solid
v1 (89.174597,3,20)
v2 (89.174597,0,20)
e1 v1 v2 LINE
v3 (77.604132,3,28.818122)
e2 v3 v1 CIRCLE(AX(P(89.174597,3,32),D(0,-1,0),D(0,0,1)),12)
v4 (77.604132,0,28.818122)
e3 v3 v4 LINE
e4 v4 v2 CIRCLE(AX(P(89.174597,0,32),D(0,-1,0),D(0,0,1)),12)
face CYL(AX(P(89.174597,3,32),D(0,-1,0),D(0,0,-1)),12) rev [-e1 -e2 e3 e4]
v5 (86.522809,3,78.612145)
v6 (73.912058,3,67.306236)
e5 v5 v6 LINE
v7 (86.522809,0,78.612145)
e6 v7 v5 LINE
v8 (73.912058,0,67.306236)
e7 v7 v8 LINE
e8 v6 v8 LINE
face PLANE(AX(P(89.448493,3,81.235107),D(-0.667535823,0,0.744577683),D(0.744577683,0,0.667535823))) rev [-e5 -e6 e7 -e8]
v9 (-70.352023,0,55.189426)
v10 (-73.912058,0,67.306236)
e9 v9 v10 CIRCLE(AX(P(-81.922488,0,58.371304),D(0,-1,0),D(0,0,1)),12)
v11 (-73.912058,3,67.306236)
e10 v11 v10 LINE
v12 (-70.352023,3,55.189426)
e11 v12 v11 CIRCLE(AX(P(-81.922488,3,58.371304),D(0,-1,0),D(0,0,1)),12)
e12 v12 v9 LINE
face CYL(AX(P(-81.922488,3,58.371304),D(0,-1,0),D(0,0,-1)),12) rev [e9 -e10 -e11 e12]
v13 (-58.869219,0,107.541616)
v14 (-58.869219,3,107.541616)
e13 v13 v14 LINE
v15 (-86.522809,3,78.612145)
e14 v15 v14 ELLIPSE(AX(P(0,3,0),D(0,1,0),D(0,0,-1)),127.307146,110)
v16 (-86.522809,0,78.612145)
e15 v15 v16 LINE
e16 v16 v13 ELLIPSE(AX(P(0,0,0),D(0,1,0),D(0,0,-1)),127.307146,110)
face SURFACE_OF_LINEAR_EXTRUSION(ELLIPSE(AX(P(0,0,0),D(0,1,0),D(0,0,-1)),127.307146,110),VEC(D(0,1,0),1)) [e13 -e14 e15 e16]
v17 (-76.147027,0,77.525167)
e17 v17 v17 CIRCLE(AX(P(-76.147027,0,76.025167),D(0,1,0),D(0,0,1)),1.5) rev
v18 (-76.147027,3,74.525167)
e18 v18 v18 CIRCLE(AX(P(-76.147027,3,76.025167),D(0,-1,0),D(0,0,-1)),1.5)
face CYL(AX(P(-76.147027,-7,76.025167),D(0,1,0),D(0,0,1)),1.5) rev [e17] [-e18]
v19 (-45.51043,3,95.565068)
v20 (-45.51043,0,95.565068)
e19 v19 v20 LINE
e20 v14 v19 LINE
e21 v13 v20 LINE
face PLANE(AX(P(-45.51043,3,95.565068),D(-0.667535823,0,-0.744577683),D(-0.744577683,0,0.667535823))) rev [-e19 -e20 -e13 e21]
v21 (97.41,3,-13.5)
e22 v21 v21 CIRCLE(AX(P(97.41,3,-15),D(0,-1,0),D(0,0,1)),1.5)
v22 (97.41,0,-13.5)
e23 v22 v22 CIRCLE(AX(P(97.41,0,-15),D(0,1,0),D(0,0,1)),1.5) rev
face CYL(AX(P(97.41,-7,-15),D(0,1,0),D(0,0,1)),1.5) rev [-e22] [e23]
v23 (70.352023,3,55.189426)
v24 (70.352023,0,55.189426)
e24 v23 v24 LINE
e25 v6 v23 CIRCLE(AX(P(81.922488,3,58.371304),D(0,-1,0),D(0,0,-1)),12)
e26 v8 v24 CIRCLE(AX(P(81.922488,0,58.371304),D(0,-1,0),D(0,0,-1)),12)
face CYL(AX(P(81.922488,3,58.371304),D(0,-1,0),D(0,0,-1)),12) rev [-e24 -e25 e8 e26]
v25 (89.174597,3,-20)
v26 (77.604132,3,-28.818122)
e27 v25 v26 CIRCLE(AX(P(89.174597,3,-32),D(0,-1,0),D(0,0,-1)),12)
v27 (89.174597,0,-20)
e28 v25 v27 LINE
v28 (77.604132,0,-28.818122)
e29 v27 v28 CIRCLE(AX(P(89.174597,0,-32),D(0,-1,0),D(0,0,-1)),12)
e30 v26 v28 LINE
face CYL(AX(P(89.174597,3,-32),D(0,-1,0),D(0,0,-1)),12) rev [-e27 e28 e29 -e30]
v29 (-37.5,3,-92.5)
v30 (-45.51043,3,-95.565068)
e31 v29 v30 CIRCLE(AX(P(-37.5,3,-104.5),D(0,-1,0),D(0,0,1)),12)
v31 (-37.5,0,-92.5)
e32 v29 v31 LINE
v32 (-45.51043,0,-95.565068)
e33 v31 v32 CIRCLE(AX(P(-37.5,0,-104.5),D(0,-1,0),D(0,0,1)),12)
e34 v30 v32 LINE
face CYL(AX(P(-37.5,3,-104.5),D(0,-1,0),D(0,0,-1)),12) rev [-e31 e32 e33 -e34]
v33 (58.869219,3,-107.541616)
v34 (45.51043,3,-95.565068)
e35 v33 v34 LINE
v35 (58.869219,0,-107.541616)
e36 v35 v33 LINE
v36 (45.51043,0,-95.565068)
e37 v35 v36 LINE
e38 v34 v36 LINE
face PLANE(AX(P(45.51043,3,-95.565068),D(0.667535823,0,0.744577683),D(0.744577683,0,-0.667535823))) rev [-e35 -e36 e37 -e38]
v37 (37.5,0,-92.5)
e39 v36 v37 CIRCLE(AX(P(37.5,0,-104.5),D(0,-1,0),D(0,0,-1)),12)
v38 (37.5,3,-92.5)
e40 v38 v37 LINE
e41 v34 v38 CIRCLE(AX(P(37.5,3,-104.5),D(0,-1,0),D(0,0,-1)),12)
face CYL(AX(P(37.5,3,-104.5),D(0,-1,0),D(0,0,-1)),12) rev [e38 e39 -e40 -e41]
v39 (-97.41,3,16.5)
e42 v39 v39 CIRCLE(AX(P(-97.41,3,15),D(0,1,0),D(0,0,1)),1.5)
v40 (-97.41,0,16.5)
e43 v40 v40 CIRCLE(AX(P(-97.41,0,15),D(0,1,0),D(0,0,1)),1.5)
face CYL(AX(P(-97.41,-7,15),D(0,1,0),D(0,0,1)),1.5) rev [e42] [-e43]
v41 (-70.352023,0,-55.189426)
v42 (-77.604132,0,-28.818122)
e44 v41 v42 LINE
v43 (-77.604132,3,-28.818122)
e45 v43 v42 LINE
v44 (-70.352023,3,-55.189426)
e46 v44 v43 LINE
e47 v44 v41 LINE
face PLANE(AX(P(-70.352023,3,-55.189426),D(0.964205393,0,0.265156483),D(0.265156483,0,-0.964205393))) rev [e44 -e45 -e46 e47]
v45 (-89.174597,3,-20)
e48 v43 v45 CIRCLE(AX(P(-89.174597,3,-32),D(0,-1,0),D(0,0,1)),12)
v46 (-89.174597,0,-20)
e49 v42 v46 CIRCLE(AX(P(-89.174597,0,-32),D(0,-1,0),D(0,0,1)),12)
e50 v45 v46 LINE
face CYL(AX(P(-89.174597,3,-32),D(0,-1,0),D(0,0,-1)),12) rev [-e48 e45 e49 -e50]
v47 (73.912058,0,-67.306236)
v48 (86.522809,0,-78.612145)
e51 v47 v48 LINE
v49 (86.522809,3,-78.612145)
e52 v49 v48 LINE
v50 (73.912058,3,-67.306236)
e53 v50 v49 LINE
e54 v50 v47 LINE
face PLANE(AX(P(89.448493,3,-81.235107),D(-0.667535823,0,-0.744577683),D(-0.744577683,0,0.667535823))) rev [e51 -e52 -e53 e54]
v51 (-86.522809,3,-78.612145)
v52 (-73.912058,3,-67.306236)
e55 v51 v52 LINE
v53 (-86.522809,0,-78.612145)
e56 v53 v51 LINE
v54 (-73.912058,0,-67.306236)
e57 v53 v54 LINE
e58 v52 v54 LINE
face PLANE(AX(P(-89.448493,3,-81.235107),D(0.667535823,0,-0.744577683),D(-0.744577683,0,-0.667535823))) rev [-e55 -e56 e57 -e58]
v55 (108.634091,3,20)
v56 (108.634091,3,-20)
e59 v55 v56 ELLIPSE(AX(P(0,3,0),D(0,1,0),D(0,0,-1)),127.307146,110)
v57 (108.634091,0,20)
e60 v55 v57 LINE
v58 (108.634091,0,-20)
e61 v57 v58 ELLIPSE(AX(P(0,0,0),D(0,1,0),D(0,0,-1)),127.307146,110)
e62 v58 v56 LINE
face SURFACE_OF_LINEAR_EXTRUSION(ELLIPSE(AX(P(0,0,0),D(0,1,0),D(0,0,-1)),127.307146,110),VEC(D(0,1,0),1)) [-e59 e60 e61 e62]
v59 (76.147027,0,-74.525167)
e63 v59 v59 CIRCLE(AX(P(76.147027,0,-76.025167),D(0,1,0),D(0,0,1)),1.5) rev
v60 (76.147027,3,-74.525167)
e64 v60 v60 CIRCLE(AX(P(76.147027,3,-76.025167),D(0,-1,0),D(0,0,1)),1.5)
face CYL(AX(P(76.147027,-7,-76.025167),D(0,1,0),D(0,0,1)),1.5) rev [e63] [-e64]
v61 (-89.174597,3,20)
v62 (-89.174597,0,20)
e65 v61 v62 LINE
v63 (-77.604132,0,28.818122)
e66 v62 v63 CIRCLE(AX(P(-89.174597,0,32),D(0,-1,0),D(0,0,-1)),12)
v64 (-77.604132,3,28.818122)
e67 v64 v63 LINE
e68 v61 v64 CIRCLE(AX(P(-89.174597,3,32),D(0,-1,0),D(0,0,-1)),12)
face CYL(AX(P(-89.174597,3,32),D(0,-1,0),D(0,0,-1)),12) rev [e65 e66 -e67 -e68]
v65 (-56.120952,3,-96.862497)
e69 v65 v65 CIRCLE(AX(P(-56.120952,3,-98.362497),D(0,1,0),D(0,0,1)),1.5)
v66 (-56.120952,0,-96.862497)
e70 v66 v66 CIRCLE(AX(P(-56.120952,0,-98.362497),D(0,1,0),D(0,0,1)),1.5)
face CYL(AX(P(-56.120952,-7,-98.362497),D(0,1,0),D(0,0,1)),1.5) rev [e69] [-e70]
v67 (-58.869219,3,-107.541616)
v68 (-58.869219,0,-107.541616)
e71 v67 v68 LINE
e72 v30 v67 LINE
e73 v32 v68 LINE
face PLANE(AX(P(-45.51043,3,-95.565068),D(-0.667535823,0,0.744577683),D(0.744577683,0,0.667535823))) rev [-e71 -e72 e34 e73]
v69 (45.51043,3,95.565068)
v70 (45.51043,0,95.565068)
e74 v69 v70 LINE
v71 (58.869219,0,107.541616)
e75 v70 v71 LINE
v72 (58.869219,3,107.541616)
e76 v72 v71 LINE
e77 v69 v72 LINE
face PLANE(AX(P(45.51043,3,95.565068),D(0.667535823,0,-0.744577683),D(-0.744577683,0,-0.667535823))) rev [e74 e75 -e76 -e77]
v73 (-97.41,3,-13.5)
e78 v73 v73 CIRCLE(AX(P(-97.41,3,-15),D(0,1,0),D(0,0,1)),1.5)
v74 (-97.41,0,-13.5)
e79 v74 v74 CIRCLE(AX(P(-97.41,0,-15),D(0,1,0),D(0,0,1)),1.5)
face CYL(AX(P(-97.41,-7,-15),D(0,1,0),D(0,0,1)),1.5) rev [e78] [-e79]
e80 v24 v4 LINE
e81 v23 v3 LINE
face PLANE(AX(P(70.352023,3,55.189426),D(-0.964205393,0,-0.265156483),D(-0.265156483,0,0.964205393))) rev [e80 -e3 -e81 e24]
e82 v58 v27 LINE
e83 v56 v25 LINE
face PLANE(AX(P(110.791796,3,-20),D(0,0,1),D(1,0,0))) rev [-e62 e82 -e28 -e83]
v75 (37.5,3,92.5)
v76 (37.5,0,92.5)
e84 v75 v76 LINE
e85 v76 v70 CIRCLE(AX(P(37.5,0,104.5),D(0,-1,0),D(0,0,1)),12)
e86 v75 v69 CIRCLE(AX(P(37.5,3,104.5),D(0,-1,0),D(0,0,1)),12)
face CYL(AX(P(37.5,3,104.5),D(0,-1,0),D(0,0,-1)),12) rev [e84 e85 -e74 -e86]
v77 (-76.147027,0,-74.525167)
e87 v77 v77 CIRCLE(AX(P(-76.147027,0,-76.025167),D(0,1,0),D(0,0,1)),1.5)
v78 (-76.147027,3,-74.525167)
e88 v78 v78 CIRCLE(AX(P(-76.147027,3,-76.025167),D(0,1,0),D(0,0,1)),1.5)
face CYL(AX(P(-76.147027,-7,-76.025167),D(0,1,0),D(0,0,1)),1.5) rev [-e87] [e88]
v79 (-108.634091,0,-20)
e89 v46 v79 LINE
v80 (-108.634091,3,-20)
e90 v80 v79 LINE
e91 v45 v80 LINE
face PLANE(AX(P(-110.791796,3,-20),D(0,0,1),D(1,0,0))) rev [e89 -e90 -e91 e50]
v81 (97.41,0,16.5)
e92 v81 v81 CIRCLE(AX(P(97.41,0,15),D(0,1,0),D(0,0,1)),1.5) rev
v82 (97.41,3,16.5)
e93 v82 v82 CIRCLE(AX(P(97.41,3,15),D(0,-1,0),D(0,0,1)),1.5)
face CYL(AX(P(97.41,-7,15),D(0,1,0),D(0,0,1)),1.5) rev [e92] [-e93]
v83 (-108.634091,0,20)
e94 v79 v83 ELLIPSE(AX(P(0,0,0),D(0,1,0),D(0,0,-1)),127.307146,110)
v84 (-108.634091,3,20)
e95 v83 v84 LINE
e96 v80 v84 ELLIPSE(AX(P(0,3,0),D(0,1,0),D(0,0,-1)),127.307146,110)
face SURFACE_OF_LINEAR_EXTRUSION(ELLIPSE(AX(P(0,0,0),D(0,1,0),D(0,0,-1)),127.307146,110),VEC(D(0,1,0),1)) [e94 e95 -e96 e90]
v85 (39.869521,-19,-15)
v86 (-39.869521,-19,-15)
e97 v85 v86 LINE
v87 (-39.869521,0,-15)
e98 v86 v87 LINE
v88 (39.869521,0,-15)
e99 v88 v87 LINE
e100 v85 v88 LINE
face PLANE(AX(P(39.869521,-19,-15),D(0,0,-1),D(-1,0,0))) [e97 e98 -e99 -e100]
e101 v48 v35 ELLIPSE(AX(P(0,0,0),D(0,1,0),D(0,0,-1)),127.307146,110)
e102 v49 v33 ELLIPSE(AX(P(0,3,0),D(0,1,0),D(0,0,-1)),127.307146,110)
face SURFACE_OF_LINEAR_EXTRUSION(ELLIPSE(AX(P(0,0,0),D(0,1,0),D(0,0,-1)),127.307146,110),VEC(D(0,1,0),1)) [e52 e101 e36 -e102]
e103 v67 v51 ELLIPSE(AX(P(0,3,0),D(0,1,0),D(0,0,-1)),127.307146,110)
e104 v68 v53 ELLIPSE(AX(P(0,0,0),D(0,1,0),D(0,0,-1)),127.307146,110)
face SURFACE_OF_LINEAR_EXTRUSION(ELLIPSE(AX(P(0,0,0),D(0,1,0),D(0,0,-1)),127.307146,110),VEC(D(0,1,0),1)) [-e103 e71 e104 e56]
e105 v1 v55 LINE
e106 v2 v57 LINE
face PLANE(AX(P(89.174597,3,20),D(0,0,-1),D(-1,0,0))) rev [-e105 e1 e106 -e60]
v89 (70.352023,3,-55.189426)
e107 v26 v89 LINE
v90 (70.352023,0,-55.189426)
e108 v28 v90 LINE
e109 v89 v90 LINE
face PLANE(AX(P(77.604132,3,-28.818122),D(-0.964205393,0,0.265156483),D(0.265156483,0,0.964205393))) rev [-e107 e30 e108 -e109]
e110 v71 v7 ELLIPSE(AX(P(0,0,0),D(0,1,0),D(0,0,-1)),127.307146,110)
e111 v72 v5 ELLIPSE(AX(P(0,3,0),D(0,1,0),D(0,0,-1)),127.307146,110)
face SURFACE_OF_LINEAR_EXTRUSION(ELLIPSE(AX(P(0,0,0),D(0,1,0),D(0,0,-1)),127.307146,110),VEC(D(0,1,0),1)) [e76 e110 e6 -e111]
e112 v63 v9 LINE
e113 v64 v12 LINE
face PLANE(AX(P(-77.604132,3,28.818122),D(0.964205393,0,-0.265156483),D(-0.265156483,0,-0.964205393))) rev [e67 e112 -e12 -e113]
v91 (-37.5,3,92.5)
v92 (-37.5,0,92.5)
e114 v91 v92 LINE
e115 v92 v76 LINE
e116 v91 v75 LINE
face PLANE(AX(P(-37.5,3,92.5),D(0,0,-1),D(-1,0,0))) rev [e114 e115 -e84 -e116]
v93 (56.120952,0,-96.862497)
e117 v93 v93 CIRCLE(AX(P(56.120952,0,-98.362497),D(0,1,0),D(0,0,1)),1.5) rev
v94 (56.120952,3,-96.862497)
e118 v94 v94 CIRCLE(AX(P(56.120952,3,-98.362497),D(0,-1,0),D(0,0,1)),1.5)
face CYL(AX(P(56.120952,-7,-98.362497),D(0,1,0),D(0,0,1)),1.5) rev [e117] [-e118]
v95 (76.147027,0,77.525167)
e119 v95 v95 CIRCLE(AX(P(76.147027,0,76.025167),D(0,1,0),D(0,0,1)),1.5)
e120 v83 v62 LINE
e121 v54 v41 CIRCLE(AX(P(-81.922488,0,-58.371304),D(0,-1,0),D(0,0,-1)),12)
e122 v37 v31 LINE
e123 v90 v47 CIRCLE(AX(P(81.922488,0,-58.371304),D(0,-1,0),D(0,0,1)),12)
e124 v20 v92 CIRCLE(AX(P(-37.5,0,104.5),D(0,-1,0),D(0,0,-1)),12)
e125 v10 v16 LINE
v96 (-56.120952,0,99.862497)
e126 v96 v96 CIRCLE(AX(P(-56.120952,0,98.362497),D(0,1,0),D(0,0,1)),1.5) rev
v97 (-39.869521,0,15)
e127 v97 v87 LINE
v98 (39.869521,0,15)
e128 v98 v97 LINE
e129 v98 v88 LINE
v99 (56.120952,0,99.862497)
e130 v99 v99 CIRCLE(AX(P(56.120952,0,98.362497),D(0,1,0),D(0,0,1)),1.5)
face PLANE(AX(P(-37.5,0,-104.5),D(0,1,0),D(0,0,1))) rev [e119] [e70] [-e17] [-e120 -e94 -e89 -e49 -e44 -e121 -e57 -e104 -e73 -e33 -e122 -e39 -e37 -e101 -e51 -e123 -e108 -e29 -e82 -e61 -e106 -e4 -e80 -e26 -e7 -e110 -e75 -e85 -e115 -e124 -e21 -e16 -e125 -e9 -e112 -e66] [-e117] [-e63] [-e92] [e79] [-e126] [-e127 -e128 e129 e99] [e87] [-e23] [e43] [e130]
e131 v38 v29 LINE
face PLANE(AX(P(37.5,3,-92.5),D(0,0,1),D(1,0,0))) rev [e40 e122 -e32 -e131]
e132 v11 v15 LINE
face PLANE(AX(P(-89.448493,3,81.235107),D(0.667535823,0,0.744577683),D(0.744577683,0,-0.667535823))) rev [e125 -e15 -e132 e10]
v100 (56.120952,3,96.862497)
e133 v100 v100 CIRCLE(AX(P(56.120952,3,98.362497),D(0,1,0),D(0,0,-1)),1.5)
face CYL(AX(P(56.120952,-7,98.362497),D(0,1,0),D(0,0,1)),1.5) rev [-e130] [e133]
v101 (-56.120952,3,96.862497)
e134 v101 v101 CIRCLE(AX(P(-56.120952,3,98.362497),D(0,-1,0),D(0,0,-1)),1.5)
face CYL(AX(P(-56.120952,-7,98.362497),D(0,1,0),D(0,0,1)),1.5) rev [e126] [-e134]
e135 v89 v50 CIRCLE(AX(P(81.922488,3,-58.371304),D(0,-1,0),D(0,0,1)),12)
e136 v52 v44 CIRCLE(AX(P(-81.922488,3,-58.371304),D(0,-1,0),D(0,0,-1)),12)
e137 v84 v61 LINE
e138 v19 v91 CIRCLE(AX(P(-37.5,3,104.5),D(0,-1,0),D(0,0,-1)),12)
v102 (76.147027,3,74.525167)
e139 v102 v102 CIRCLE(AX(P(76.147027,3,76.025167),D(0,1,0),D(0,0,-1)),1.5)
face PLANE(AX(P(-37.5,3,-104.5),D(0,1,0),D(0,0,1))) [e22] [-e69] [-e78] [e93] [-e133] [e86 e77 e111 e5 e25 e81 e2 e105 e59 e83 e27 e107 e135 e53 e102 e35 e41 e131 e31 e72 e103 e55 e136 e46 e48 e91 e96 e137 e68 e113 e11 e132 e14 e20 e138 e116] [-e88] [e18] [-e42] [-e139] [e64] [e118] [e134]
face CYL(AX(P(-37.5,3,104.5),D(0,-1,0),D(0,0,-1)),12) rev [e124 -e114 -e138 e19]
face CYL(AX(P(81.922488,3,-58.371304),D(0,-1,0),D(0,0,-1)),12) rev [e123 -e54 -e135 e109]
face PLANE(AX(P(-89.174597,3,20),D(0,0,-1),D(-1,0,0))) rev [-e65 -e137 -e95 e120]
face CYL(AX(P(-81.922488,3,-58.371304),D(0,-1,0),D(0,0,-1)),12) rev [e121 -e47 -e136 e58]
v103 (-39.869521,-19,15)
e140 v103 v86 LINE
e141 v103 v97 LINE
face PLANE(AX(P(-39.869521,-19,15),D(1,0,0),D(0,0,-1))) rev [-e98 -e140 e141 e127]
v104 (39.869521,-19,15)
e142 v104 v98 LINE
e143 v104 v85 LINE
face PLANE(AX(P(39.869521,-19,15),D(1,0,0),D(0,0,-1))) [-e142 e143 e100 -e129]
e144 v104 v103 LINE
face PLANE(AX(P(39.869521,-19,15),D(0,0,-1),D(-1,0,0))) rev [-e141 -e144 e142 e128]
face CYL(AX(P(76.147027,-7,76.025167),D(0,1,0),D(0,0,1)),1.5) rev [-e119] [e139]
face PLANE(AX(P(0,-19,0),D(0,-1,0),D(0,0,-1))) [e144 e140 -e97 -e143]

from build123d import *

# Parameters (mm, degrees)
SKETCH2_R               = 1.5
BOSS_EXTRUDE1_DEPTH     = 3
SKETCH7_R               = 1.5
CUT_EXTRUDE4_DEPTH      = 10
MIRROR2_COPY_1_SKETCH_R = 1.5
MIRROR2_COPY_1_DEPTH    = 10
CUT_EXTRUDE5_START      = -10
SKETCH8_R               = 1.5
CUT_EXTRUDE5_DEPTH      = 10
CUT_EXTRUDE6_START      = -3
CUT_EXTRUDE6_OUTLINE_R  = 1.5
CUT_EXTRUDE6_DEPTH      = 3
SKETCH10_W              = 79.739042834
SKETCH10_H              = 30
BOSS_EXTRUDE2_DEPTH     = 19


# Read off the part's stored shape, not the designer's step: Cut-Extrude6
with BuildPart() as part:
    # Sketch2 → Boss-Extrude1 (new body)
    with BuildSketch(Plane(origin=(0, 0, 0), x_dir=(1, 0, 0), z_dir=(0, 1, 0))):
        with BuildLine():
            Line((77.604131862, 28.818122204), (70.352023373, 55.1894258))
            ThreePointArc((70.352023373, 55.1894258), (70.409142384, 61.75403485), (73.912058214, 67.306235788))
            Line((73.912058214, 67.306235788), (89.448492578, 81.235106792))
            ThreePointArc((89.448492578, 81.235106792), (90.603066053, 81.737789877), (91.829194878, 81.450843369))
            ThreePointArc((91.829194878, 81.450843369), (98.283456403, 82.511045735), (98.166159929, 89.050752337))
            Line((98.166159929, 89.050752337), (71.464727022, 118.833859641))
            ThreePointArc((71.464727022, 118.833859641), (64.976597411, 119.661926694), (63.220516764, 113.361315481))
            ThreePointArc((63.220516764, 113.361315481), (63.372367291, 112.111246838), (62.747059671, 111.018214097))
            Line((62.747059671, 111.018214097), (45.510429872, 95.565067809))
            ThreePointArc((45.510429872, 95.565067809), (41.788403765, 93.292431435), (37.5, 92.5))
            Line((37.5, 92.5), (-37.5, 92.5))
            ThreePointArc((-37.5, 92.5), (-41.788403765, 93.292431435), (-45.510429872, 95.565067809))
            Line((-45.510429872, 95.565067809), (-62.747059671, 111.018214097))
            ThreePointArc((-62.747059671, 111.018214097), (-63.372367291, 112.111246838), (-63.220516764, 113.361315481))
            ThreePointArc((-63.220516764, 113.361315481), (-64.976597411, 119.661926694), (-71.464727022, 118.833859641))
            Line((-71.464727022, 118.833859641), (-98.166159929, 89.050752337))
            ThreePointArc((-98.166159929, 89.050752337), (-98.283456403, 82.511045735), (-91.829194878, 81.450843369))
            ThreePointArc((-91.829194878, 81.450843369), (-90.603066053, 81.737789877), (-89.448492578, 81.235106792))
            Line((-89.448492578, 81.235106792), (-73.912058214, 67.306235788))
            ThreePointArc((-73.912058214, 67.306235788), (-70.409142384, 61.75403485), (-70.352023373, 55.1894258))
            Line((-70.352023373, 55.1894258), (-77.604131862, 28.818122204))
            ThreePointArc((-77.604131862, 28.818122204), (-81.900757615, 22.455825506), (-89.174596575, 20))
            Line((-89.174596575, 20), (-110.791796068, 20))
            ThreePointArc((-110.791796068, 20), (-111.987024677, 20.396432549), (-112.708425763, 21.428571429))
            ThreePointArc((-112.708425763, 21.428571429), (-118.221847911, 24.947619184), (-122.5, 20))
            Line((-122.5, 20), (-122.5, -20))
            ThreePointArc((-122.5, -20), (-118.221847911, -24.947619184), (-112.708425762, -21.428571429))
            ThreePointArc((-112.708425762, -21.428571429), (-111.987024677, -20.396432549), (-110.791796067, -20))
            Line((-110.791796067, -20), (-89.174596575, -20))
            ThreePointArc((-89.174596575, -20), (-81.900757615, -22.455825506), (-77.604131862, -28.818122204))
            Line((-77.604131862, -28.818122204), (-70.352023373, -55.1894258))
            ThreePointArc((-70.352023373, -55.1894258), (-70.409142384, -61.75403485), (-73.912058214, -67.306235788))
            Line((-73.912058214, -67.306235788), (-89.448492578, -81.235106792))
            ThreePointArc((-89.448492578, -81.235106792), (-90.603066053, -81.737789877), (-91.829194878, -81.450843369))
            ThreePointArc((-91.829194878, -81.450843369), (-98.283456403, -82.511045735), (-98.166159929, -89.050752337))
            Line((-98.166159929, -89.050752337), (-71.464727022, -118.833859641))
            ThreePointArc((-71.464727022, -118.833859641), (-64.976597411, -119.661926694), (-63.220516764, -113.361315481))
            ThreePointArc((-63.220516764, -113.361315481), (-63.372367291, -112.111246838), (-62.747059671, -111.018214097))
            Line((-62.747059671, -111.018214097), (-45.510429872, -95.565067809))
            ThreePointArc((-45.510429872, -95.565067809), (-41.788403765, -93.292431435), (-37.5, -92.5))
            Line((-37.5, -92.5), (37.5, -92.5))
            ThreePointArc((37.5, -92.5), (41.788403765, -93.292431435), (45.510429872, -95.565067809))
            Line((45.510429872, -95.565067809), (62.747059671, -111.018214097))
            ThreePointArc((62.747059671, -111.018214097), (63.372367291, -112.111246838), (63.220516764, -113.361315481))
            ThreePointArc((63.220516764, -113.361315481), (64.976597411, -119.661926694), (71.464727022, -118.833859641))
            Line((71.464727022, -118.833859641), (98.166159929, -89.050752337))
            ThreePointArc((98.166159929, -89.050752337), (98.283456403, -82.511045735), (91.829194878, -81.450843369))
            ThreePointArc((91.829194878, -81.450843369), (90.603066053, -81.737789877), (89.448492578, -81.235106792))
            Line((89.448492578, -81.235106792), (73.912058214, -67.306235788))
            ThreePointArc((73.912058214, -67.306235788), (70.409142384, -61.75403485), (70.352023373, -55.1894258))
            Line((70.352023373, -55.1894258), (77.604131862, -28.818122204))
            ThreePointArc((77.604131862, -28.818122204), (81.900757615, -22.455825506), (89.174596575, -20))
            Line((89.174596575, -20), (110.791796067, -20))
            ThreePointArc((110.791796067, -20), (111.987024677, -20.396432549), (112.708425762, -21.428571429))
            ThreePointArc((112.708425762, -21.428571429), (118.221847911, -24.947619184), (122.5, -20))
            Line((122.5, -20), (122.5, 20))
            ThreePointArc((122.5, 20), (118.221847911, 24.947619184), (112.708425763, 21.428571429))
            ThreePointArc((112.708425763, 21.428571429), (111.987024677, 20.396432549), (110.791796068, 20))
            Line((110.791796068, 20), (89.174596575, 20))
            ThreePointArc((89.174596575, 20), (81.900757615, 22.455825506), (77.604131862, 28.818122204))
        make_face()
        with Locations(Location((-91.038580411, 89.375883412, 0), (0, 0, 270))):
            Circle(SKETCH2_R, mode=Mode.SUBTRACT)
        with Locations(Location((-71.012505731, 111.713213891, 0), (0, 0, 90))):
            Circle(SKETCH2_R, mode=Mode.SUBTRACT)
        with Locations(Location((91.038580411, 89.375883412, 0), (0, 0, 90))):
            Circle(SKETCH2_R, mode=Mode.SUBTRACT)
        with Locations(Location((71.012505731, 111.713213891, 0), (0, 0, 270))):
            Circle(SKETCH2_R, mode=Mode.SUBTRACT)
        with Locations(Location((91.038580411, -89.375883412, 0), (0, 0, 270))):
            Circle(SKETCH2_R, mode=Mode.SUBTRACT)
        with Locations(Location((71.012505731, -111.713213891, 0), (0, 0, 90))):
            Circle(SKETCH2_R, mode=Mode.SUBTRACT)
        with Locations(Location((-71.012505731, -111.713213891, 0), (0, 0, 270))):
            Circle(SKETCH2_R, mode=Mode.SUBTRACT)
        with Locations(Location((-91.038580411, -89.375883412, 0), (0, 0, 90))):
            Circle(SKETCH2_R, mode=Mode.SUBTRACT)
        with Locations(Location((-117.41, -15, 0), (0, 0, 270))):
            Circle(SKETCH2_R, mode=Mode.SUBTRACT)
        with Locations(Location((-117.41, 15, 0), (0, 0, 90))):
            Circle(SKETCH2_R, mode=Mode.SUBTRACT)
        with Locations(Location((117.41, -15, 0), (0, 0, 90))):
            Circle(SKETCH2_R, mode=Mode.SUBTRACT)
        with Locations(Location((117.41, 15, 0), (0, 0, 270))):
            Circle(SKETCH2_R, mode=Mode.SUBTRACT)
    extrude(amount=BOSS_EXTRUDE1_DEPTH)

    # Sketch7 → Cut-Extrude4 (cut)
    with BuildSketch(Plane(origin=(0, 3, 0), x_dir=(1, 0, 0), z_dir=(0, 1, 0))):
        with Locations(Location((-76.147026759, 76.025166959, 0), (0, 0, 270))):
            Circle(SKETCH7_R)
        with Locations(Location((-56.120952079, 98.362497437, 0), (0, 0, 270))):
            Circle(SKETCH7_R)
    cut_extrude4 = extrude(amount=-CUT_EXTRUDE4_DEPTH, mode=Mode.SUBTRACT)

    # Mirror1: Cut-Extrude4 across plane
    add(cut_extrude4.mirror(Plane(origin=(0, 0, 0), x_dir=(0, 0, 1), z_dir=(1, 0, 0))), mode=Mode.SUBTRACT)

    # Mirror2: Cut-Extrude4 across plane
    add(cut_extrude4.mirror(Plane.XY), mode=Mode.SUBTRACT)

    # Mirror2 copy 1 sketch → Mirror2 copy 1 (cut)
    with BuildSketch(Plane(origin=(0, 3, 0), x_dir=(-1, 0, 0), z_dir=(0, 1, 0))):
        with Locations(Location((-76.147026759, 76.025166959, 0), (0, 0, 270))):
            Circle(MIRROR2_COPY_1_SKETCH_R)
        with Locations(Location((-56.120952079, 98.362497437, 0), (0, 0, 270))):
            Circle(MIRROR2_COPY_1_SKETCH_R)
    extrude(amount=-MIRROR2_COPY_1_DEPTH, mode=Mode.SUBTRACT)

    # Sketch8 → Cut-Extrude5 (cut)
    with BuildSketch(Plane(origin=(0, 3, 0), x_dir=(1, 0, 0), z_dir=(0, 1, 0)).offset(CUT_EXTRUDE5_START)):
        with Locations(Location((-117.41, 15, 0), (0, 0, 90))):
            Circle(SKETCH8_R)
        with Locations(Location((-117.41, -15, 0), (0, 0, 270))):
            Circle(SKETCH8_R)
        with Locations(Location((-97.41, -15, 0), (0, 0, 270))):
            Circle(SKETCH8_R)
        with Locations(Location((-97.41, 15, 0), (0, 0, 270))):
            Circle(SKETCH8_R)
    cut_extrude5 = extrude(amount=CUT_EXTRUDE5_DEPTH, mode=Mode.SUBTRACT)

    # Mirror3: Cut-Extrude5 across plane
    add(cut_extrude5.mirror(Plane(origin=(0, 0, 0), x_dir=(0, 0, 1), z_dir=(1, 0, 0))), mode=Mode.SUBTRACT)

    # Cut-Extrude6 outline → Cut-Extrude6 (cut)
    # profile 1 of 6: a face of its own
    with BuildSketch(Plane(origin=(0, 3, 0), x_dir=(1, 0, 0), z_dir=(0, 1, 0)).offset(CUT_EXTRUDE6_START)):
        with BuildLine():
            add(Edge.make_bspline(
                [(86.522808724, 78.612145047), (74.844785146, 95.828075633), (58.86921899, 107.541615712)],
                knots=[5.377949175, 5.377949175, 5.377949175, 5.718470743, 5.718470743, 5.718470743], degree=2, weights=[1, 0.985540613, 1]))
            Line((86.522808724, 78.612145047), (89.448492578, 81.235106792))
            ThreePointArc((89.448492578, 81.235106792), (90.603066053, 81.737789877), (91.829194878, 81.450843369))
            ThreePointArc((91.829194878, 81.450843369), (98.283456403, 82.511045736), (98.166159929, 89.050752337))
            Line((98.166159929, 89.050752337), (71.464727022, 118.833859641))
            ThreePointArc((71.464727022, 118.833859641), (64.976597411, 119.661926694), (63.220516764, 113.361315481))
            ThreePointArc((63.220516764, 113.361315481), (63.372367291, 112.111246838), (62.747059671, 111.018214097))
            Line((62.747059671, 111.018214097), (58.86921899, 107.541615712))
        make_face()
        with Locations((91.038580411, 89.375883412)):
            Circle(CUT_EXTRUDE6_OUTLINE_R, mode=Mode.SUBTRACT)
        with Locations((71.012505731, 111.713213891)):
            Circle(CUT_EXTRUDE6_OUTLINE_R, mode=Mode.SUBTRACT)
    # profile 2 of 6: a face of its own
    with BuildSketch(Plane(origin=(0, 3, 0), x_dir=(1, 0, 0), z_dir=(0, 1, 0)).offset(CUT_EXTRUDE6_START)):
        with BuildLine():
            add(Edge.make_bspline(
                [(108.634090523, -20), (111.383083724, 0), (108.634090523, 20)],
                knots=[4.554635104, 4.554635104, 4.554635104, 4.870142857, 4.870142857, 4.870142857], degree=2, weights=[1, 0.987582641, 1]))
            Line((108.634090523, -20), (110.791796068, -20))
            ThreePointArc((110.791796068, -20), (111.987024677, -20.396432549), (112.708425762, -21.428571429))
            ThreePointArc((112.708425762, -21.428571429), (118.221847911, -24.947619184), (122.5, -20))
            Line((122.5, -20), (122.5, 20))
            ThreePointArc((122.5, 20), (118.221847911, 24.947619184), (112.708425763, 21.428571429))
            ThreePointArc((112.708425763, 21.428571429), (111.987024677, 20.396432549), (110.791796068, 20))
            Line((110.791796068, 20), (108.634090523, 20))
        make_face()
        with Locations((117.41, -15)):
            Circle(CUT_EXTRUDE6_OUTLINE_R, mode=Mode.SUBTRACT)
        with Locations((117.41, 15)):
            Circle(CUT_EXTRUDE6_OUTLINE_R, mode=Mode.SUBTRACT)
    # profile 3 of 6: a face of its own
    with BuildSketch(Plane(origin=(0, 3, 0), x_dir=(1, 0, 0), z_dir=(0, 1, 0)).offset(CUT_EXTRUDE6_START)):
        with BuildLine():
            add(Edge.make_bspline(
                [(58.86921899, -107.541615712), (74.844785146, -95.828075633), (86.522808724, -78.612145047)],
                knots=[3.706307217, 3.706307217, 3.706307217, 4.046828786, 4.046828786, 4.046828786], degree=2, weights=[1, 0.985540613, 1]))
            Line((58.86921899, -107.541615712), (62.747059671, -111.018214097))
            ThreePointArc((62.747059671, -111.018214097), (63.372367291, -112.111246838), (63.220516764, -113.361315481))
            ThreePointArc((63.220516764, -113.361315481), (64.976597411, -119.661926694), (71.464727022, -118.833859641))
            Line((71.464727022, -118.833859641), (98.166159929, -89.050752337))
            ThreePointArc((98.166159929, -89.050752337), (98.283456403, -82.511045736), (91.829194878, -81.450843369))
            ThreePointArc((91.829194878, -81.450843369), (90.603066053, -81.737789877), (89.448492578, -81.235106792))
            Line((89.448492578, -81.235106792), (86.522808724, -78.612145047))
        make_face()
        with Locations((71.012505731, -111.713213891)):
            Circle(CUT_EXTRUDE6_OUTLINE_R, mode=Mode.SUBTRACT)
        with Locations((91.038580411, -89.375883412)):
            Circle(CUT_EXTRUDE6_OUTLINE_R, mode=Mode.SUBTRACT)
    # profile 4 of 6: a face of its own
    with BuildSketch(Plane(origin=(0, 3, 0), x_dir=(1, 0, 0), z_dir=(0, 1, 0)).offset(CUT_EXTRUDE6_START)):
        with BuildLine():
            add(Edge.make_bspline(
                [(-86.522808724, -78.612145047), (-74.844785146, -95.828075633), (-58.86921899, -107.541615712)],
                knots=[2.236356522, 2.236356522, 2.236356522, 2.57687809, 2.57687809, 2.57687809], degree=2, weights=[1, 0.985540613, 1]))
            Line((-86.522808724, -78.612145047), (-89.448492578, -81.235106792))
            ThreePointArc((-89.448492578, -81.235106792), (-90.603066053, -81.737789877), (-91.829194878, -81.450843369))
            ThreePointArc((-91.829194878, -81.450843369), (-98.283456403, -82.511045736), (-98.166159929, -89.050752337))
            Line((-98.166159929, -89.050752337), (-71.464727022, -118.833859641))
            ThreePointArc((-71.464727022, -118.833859641), (-64.976597411, -119.661926694), (-63.220516764, -113.361315481))
            ThreePointArc((-63.220516764, -113.361315481), (-63.372367291, -112.111246838), (-62.747059671, -111.018214097))
            Line((-62.747059671, -111.018214097), (-58.86921899, -107.541615712))
        make_face()
        with Locations((-71.012505731, -111.713213891)):
            Circle(CUT_EXTRUDE6_OUTLINE_R, mode=Mode.SUBTRACT)
        with Locations((-91.038580411, -89.375883412)):
            Circle(CUT_EXTRUDE6_OUTLINE_R, mode=Mode.SUBTRACT)
    # profile 5 of 6: a face of its own
    with BuildSketch(Plane(origin=(0, 3, 0), x_dir=(1, 0, 0), z_dir=(0, 1, 0)).offset(CUT_EXTRUDE6_START)):
        with BuildLine():
            add(Edge.make_bspline(
                [(-108.634090523, 20), (-111.383083724, 0), (-108.634090523, -20)],
                knots=[1.41304245, 1.41304245, 1.41304245, 1.728550203, 1.728550203, 1.728550203], degree=2, weights=[1, 0.987582641, 1]))
            Line((-108.634090523, 20), (-110.791796068, 20))
            ThreePointArc((-110.791796068, 20), (-111.987024677, 20.396432549), (-112.708425763, 21.428571429))
            ThreePointArc((-112.708425763, 21.428571429), (-118.221847911, 24.947619184), (-122.5, 20))
            Line((-122.5, 20), (-122.5, -20))
            ThreePointArc((-122.5, -20), (-118.221847911, -24.947619184), (-112.708425762, -21.428571429))
            ThreePointArc((-112.708425762, -21.428571429), (-111.987024677, -20.396432549), (-110.791796068, -20))
            Line((-110.791796068, -20), (-108.634090523, -20))
        make_face()
        with Locations((-117.41, -15)):
            Circle(CUT_EXTRUDE6_OUTLINE_R, mode=Mode.SUBTRACT)
        with Locations((-117.41, 15)):
            Circle(CUT_EXTRUDE6_OUTLINE_R, mode=Mode.SUBTRACT)
    # profile 6 of 6: a face of its own
    with BuildSketch(Plane(origin=(0, 3, 0), x_dir=(1, 0, 0), z_dir=(0, 1, 0)).offset(CUT_EXTRUDE6_START)):
        with BuildLine():
            add(Edge.make_bspline(
                [(-58.86921899, 107.541615712), (-74.844785146, 95.828075633), (-86.522808724, 78.612145047)],
                knots=[0.564714564, 0.564714564, 0.564714564, 0.905236132, 0.905236132, 0.905236132], degree=2, weights=[1, 0.985540613, 1]))
            Line((-58.86921899, 107.541615712), (-62.747059671, 111.018214097))
            ThreePointArc((-62.747059671, 111.018214097), (-63.372367291, 112.111246838), (-63.220516764, 113.361315481))
            ThreePointArc((-63.220516764, 113.361315481), (-64.976597411, 119.661926694), (-71.464727022, 118.833859641))
            Line((-71.464727022, 118.833859641), (-98.166159929, 89.050752337))
            ThreePointArc((-98.166159929, 89.050752337), (-98.283456403, 82.511045736), (-91.829194878, 81.450843369))
            ThreePointArc((-91.829194878, 81.450843369), (-90.603066053, 81.737789877), (-89.448492578, 81.235106792))
            Line((-89.448492578, 81.235106792), (-86.522808724, 78.612145047))
        make_face()
        with Locations((-91.038580411, 89.375883412)):
            Circle(CUT_EXTRUDE6_OUTLINE_R, mode=Mode.SUBTRACT)
        with Locations((-71.012505731, 111.713213891)):
            Circle(CUT_EXTRUDE6_OUTLINE_R, mode=Mode.SUBTRACT)
    extrude(amount=CUT_EXTRUDE6_DEPTH, mode=Mode.SUBTRACT)

    # Sketch10 → Boss-Extrude2 (add)
    with BuildSketch(Plane.XZ):
        Rectangle(SKETCH10_W, SKETCH10_H)
    extrude(amount=BOSS_EXTRUDE2_DEPTH)


solid = part.part
